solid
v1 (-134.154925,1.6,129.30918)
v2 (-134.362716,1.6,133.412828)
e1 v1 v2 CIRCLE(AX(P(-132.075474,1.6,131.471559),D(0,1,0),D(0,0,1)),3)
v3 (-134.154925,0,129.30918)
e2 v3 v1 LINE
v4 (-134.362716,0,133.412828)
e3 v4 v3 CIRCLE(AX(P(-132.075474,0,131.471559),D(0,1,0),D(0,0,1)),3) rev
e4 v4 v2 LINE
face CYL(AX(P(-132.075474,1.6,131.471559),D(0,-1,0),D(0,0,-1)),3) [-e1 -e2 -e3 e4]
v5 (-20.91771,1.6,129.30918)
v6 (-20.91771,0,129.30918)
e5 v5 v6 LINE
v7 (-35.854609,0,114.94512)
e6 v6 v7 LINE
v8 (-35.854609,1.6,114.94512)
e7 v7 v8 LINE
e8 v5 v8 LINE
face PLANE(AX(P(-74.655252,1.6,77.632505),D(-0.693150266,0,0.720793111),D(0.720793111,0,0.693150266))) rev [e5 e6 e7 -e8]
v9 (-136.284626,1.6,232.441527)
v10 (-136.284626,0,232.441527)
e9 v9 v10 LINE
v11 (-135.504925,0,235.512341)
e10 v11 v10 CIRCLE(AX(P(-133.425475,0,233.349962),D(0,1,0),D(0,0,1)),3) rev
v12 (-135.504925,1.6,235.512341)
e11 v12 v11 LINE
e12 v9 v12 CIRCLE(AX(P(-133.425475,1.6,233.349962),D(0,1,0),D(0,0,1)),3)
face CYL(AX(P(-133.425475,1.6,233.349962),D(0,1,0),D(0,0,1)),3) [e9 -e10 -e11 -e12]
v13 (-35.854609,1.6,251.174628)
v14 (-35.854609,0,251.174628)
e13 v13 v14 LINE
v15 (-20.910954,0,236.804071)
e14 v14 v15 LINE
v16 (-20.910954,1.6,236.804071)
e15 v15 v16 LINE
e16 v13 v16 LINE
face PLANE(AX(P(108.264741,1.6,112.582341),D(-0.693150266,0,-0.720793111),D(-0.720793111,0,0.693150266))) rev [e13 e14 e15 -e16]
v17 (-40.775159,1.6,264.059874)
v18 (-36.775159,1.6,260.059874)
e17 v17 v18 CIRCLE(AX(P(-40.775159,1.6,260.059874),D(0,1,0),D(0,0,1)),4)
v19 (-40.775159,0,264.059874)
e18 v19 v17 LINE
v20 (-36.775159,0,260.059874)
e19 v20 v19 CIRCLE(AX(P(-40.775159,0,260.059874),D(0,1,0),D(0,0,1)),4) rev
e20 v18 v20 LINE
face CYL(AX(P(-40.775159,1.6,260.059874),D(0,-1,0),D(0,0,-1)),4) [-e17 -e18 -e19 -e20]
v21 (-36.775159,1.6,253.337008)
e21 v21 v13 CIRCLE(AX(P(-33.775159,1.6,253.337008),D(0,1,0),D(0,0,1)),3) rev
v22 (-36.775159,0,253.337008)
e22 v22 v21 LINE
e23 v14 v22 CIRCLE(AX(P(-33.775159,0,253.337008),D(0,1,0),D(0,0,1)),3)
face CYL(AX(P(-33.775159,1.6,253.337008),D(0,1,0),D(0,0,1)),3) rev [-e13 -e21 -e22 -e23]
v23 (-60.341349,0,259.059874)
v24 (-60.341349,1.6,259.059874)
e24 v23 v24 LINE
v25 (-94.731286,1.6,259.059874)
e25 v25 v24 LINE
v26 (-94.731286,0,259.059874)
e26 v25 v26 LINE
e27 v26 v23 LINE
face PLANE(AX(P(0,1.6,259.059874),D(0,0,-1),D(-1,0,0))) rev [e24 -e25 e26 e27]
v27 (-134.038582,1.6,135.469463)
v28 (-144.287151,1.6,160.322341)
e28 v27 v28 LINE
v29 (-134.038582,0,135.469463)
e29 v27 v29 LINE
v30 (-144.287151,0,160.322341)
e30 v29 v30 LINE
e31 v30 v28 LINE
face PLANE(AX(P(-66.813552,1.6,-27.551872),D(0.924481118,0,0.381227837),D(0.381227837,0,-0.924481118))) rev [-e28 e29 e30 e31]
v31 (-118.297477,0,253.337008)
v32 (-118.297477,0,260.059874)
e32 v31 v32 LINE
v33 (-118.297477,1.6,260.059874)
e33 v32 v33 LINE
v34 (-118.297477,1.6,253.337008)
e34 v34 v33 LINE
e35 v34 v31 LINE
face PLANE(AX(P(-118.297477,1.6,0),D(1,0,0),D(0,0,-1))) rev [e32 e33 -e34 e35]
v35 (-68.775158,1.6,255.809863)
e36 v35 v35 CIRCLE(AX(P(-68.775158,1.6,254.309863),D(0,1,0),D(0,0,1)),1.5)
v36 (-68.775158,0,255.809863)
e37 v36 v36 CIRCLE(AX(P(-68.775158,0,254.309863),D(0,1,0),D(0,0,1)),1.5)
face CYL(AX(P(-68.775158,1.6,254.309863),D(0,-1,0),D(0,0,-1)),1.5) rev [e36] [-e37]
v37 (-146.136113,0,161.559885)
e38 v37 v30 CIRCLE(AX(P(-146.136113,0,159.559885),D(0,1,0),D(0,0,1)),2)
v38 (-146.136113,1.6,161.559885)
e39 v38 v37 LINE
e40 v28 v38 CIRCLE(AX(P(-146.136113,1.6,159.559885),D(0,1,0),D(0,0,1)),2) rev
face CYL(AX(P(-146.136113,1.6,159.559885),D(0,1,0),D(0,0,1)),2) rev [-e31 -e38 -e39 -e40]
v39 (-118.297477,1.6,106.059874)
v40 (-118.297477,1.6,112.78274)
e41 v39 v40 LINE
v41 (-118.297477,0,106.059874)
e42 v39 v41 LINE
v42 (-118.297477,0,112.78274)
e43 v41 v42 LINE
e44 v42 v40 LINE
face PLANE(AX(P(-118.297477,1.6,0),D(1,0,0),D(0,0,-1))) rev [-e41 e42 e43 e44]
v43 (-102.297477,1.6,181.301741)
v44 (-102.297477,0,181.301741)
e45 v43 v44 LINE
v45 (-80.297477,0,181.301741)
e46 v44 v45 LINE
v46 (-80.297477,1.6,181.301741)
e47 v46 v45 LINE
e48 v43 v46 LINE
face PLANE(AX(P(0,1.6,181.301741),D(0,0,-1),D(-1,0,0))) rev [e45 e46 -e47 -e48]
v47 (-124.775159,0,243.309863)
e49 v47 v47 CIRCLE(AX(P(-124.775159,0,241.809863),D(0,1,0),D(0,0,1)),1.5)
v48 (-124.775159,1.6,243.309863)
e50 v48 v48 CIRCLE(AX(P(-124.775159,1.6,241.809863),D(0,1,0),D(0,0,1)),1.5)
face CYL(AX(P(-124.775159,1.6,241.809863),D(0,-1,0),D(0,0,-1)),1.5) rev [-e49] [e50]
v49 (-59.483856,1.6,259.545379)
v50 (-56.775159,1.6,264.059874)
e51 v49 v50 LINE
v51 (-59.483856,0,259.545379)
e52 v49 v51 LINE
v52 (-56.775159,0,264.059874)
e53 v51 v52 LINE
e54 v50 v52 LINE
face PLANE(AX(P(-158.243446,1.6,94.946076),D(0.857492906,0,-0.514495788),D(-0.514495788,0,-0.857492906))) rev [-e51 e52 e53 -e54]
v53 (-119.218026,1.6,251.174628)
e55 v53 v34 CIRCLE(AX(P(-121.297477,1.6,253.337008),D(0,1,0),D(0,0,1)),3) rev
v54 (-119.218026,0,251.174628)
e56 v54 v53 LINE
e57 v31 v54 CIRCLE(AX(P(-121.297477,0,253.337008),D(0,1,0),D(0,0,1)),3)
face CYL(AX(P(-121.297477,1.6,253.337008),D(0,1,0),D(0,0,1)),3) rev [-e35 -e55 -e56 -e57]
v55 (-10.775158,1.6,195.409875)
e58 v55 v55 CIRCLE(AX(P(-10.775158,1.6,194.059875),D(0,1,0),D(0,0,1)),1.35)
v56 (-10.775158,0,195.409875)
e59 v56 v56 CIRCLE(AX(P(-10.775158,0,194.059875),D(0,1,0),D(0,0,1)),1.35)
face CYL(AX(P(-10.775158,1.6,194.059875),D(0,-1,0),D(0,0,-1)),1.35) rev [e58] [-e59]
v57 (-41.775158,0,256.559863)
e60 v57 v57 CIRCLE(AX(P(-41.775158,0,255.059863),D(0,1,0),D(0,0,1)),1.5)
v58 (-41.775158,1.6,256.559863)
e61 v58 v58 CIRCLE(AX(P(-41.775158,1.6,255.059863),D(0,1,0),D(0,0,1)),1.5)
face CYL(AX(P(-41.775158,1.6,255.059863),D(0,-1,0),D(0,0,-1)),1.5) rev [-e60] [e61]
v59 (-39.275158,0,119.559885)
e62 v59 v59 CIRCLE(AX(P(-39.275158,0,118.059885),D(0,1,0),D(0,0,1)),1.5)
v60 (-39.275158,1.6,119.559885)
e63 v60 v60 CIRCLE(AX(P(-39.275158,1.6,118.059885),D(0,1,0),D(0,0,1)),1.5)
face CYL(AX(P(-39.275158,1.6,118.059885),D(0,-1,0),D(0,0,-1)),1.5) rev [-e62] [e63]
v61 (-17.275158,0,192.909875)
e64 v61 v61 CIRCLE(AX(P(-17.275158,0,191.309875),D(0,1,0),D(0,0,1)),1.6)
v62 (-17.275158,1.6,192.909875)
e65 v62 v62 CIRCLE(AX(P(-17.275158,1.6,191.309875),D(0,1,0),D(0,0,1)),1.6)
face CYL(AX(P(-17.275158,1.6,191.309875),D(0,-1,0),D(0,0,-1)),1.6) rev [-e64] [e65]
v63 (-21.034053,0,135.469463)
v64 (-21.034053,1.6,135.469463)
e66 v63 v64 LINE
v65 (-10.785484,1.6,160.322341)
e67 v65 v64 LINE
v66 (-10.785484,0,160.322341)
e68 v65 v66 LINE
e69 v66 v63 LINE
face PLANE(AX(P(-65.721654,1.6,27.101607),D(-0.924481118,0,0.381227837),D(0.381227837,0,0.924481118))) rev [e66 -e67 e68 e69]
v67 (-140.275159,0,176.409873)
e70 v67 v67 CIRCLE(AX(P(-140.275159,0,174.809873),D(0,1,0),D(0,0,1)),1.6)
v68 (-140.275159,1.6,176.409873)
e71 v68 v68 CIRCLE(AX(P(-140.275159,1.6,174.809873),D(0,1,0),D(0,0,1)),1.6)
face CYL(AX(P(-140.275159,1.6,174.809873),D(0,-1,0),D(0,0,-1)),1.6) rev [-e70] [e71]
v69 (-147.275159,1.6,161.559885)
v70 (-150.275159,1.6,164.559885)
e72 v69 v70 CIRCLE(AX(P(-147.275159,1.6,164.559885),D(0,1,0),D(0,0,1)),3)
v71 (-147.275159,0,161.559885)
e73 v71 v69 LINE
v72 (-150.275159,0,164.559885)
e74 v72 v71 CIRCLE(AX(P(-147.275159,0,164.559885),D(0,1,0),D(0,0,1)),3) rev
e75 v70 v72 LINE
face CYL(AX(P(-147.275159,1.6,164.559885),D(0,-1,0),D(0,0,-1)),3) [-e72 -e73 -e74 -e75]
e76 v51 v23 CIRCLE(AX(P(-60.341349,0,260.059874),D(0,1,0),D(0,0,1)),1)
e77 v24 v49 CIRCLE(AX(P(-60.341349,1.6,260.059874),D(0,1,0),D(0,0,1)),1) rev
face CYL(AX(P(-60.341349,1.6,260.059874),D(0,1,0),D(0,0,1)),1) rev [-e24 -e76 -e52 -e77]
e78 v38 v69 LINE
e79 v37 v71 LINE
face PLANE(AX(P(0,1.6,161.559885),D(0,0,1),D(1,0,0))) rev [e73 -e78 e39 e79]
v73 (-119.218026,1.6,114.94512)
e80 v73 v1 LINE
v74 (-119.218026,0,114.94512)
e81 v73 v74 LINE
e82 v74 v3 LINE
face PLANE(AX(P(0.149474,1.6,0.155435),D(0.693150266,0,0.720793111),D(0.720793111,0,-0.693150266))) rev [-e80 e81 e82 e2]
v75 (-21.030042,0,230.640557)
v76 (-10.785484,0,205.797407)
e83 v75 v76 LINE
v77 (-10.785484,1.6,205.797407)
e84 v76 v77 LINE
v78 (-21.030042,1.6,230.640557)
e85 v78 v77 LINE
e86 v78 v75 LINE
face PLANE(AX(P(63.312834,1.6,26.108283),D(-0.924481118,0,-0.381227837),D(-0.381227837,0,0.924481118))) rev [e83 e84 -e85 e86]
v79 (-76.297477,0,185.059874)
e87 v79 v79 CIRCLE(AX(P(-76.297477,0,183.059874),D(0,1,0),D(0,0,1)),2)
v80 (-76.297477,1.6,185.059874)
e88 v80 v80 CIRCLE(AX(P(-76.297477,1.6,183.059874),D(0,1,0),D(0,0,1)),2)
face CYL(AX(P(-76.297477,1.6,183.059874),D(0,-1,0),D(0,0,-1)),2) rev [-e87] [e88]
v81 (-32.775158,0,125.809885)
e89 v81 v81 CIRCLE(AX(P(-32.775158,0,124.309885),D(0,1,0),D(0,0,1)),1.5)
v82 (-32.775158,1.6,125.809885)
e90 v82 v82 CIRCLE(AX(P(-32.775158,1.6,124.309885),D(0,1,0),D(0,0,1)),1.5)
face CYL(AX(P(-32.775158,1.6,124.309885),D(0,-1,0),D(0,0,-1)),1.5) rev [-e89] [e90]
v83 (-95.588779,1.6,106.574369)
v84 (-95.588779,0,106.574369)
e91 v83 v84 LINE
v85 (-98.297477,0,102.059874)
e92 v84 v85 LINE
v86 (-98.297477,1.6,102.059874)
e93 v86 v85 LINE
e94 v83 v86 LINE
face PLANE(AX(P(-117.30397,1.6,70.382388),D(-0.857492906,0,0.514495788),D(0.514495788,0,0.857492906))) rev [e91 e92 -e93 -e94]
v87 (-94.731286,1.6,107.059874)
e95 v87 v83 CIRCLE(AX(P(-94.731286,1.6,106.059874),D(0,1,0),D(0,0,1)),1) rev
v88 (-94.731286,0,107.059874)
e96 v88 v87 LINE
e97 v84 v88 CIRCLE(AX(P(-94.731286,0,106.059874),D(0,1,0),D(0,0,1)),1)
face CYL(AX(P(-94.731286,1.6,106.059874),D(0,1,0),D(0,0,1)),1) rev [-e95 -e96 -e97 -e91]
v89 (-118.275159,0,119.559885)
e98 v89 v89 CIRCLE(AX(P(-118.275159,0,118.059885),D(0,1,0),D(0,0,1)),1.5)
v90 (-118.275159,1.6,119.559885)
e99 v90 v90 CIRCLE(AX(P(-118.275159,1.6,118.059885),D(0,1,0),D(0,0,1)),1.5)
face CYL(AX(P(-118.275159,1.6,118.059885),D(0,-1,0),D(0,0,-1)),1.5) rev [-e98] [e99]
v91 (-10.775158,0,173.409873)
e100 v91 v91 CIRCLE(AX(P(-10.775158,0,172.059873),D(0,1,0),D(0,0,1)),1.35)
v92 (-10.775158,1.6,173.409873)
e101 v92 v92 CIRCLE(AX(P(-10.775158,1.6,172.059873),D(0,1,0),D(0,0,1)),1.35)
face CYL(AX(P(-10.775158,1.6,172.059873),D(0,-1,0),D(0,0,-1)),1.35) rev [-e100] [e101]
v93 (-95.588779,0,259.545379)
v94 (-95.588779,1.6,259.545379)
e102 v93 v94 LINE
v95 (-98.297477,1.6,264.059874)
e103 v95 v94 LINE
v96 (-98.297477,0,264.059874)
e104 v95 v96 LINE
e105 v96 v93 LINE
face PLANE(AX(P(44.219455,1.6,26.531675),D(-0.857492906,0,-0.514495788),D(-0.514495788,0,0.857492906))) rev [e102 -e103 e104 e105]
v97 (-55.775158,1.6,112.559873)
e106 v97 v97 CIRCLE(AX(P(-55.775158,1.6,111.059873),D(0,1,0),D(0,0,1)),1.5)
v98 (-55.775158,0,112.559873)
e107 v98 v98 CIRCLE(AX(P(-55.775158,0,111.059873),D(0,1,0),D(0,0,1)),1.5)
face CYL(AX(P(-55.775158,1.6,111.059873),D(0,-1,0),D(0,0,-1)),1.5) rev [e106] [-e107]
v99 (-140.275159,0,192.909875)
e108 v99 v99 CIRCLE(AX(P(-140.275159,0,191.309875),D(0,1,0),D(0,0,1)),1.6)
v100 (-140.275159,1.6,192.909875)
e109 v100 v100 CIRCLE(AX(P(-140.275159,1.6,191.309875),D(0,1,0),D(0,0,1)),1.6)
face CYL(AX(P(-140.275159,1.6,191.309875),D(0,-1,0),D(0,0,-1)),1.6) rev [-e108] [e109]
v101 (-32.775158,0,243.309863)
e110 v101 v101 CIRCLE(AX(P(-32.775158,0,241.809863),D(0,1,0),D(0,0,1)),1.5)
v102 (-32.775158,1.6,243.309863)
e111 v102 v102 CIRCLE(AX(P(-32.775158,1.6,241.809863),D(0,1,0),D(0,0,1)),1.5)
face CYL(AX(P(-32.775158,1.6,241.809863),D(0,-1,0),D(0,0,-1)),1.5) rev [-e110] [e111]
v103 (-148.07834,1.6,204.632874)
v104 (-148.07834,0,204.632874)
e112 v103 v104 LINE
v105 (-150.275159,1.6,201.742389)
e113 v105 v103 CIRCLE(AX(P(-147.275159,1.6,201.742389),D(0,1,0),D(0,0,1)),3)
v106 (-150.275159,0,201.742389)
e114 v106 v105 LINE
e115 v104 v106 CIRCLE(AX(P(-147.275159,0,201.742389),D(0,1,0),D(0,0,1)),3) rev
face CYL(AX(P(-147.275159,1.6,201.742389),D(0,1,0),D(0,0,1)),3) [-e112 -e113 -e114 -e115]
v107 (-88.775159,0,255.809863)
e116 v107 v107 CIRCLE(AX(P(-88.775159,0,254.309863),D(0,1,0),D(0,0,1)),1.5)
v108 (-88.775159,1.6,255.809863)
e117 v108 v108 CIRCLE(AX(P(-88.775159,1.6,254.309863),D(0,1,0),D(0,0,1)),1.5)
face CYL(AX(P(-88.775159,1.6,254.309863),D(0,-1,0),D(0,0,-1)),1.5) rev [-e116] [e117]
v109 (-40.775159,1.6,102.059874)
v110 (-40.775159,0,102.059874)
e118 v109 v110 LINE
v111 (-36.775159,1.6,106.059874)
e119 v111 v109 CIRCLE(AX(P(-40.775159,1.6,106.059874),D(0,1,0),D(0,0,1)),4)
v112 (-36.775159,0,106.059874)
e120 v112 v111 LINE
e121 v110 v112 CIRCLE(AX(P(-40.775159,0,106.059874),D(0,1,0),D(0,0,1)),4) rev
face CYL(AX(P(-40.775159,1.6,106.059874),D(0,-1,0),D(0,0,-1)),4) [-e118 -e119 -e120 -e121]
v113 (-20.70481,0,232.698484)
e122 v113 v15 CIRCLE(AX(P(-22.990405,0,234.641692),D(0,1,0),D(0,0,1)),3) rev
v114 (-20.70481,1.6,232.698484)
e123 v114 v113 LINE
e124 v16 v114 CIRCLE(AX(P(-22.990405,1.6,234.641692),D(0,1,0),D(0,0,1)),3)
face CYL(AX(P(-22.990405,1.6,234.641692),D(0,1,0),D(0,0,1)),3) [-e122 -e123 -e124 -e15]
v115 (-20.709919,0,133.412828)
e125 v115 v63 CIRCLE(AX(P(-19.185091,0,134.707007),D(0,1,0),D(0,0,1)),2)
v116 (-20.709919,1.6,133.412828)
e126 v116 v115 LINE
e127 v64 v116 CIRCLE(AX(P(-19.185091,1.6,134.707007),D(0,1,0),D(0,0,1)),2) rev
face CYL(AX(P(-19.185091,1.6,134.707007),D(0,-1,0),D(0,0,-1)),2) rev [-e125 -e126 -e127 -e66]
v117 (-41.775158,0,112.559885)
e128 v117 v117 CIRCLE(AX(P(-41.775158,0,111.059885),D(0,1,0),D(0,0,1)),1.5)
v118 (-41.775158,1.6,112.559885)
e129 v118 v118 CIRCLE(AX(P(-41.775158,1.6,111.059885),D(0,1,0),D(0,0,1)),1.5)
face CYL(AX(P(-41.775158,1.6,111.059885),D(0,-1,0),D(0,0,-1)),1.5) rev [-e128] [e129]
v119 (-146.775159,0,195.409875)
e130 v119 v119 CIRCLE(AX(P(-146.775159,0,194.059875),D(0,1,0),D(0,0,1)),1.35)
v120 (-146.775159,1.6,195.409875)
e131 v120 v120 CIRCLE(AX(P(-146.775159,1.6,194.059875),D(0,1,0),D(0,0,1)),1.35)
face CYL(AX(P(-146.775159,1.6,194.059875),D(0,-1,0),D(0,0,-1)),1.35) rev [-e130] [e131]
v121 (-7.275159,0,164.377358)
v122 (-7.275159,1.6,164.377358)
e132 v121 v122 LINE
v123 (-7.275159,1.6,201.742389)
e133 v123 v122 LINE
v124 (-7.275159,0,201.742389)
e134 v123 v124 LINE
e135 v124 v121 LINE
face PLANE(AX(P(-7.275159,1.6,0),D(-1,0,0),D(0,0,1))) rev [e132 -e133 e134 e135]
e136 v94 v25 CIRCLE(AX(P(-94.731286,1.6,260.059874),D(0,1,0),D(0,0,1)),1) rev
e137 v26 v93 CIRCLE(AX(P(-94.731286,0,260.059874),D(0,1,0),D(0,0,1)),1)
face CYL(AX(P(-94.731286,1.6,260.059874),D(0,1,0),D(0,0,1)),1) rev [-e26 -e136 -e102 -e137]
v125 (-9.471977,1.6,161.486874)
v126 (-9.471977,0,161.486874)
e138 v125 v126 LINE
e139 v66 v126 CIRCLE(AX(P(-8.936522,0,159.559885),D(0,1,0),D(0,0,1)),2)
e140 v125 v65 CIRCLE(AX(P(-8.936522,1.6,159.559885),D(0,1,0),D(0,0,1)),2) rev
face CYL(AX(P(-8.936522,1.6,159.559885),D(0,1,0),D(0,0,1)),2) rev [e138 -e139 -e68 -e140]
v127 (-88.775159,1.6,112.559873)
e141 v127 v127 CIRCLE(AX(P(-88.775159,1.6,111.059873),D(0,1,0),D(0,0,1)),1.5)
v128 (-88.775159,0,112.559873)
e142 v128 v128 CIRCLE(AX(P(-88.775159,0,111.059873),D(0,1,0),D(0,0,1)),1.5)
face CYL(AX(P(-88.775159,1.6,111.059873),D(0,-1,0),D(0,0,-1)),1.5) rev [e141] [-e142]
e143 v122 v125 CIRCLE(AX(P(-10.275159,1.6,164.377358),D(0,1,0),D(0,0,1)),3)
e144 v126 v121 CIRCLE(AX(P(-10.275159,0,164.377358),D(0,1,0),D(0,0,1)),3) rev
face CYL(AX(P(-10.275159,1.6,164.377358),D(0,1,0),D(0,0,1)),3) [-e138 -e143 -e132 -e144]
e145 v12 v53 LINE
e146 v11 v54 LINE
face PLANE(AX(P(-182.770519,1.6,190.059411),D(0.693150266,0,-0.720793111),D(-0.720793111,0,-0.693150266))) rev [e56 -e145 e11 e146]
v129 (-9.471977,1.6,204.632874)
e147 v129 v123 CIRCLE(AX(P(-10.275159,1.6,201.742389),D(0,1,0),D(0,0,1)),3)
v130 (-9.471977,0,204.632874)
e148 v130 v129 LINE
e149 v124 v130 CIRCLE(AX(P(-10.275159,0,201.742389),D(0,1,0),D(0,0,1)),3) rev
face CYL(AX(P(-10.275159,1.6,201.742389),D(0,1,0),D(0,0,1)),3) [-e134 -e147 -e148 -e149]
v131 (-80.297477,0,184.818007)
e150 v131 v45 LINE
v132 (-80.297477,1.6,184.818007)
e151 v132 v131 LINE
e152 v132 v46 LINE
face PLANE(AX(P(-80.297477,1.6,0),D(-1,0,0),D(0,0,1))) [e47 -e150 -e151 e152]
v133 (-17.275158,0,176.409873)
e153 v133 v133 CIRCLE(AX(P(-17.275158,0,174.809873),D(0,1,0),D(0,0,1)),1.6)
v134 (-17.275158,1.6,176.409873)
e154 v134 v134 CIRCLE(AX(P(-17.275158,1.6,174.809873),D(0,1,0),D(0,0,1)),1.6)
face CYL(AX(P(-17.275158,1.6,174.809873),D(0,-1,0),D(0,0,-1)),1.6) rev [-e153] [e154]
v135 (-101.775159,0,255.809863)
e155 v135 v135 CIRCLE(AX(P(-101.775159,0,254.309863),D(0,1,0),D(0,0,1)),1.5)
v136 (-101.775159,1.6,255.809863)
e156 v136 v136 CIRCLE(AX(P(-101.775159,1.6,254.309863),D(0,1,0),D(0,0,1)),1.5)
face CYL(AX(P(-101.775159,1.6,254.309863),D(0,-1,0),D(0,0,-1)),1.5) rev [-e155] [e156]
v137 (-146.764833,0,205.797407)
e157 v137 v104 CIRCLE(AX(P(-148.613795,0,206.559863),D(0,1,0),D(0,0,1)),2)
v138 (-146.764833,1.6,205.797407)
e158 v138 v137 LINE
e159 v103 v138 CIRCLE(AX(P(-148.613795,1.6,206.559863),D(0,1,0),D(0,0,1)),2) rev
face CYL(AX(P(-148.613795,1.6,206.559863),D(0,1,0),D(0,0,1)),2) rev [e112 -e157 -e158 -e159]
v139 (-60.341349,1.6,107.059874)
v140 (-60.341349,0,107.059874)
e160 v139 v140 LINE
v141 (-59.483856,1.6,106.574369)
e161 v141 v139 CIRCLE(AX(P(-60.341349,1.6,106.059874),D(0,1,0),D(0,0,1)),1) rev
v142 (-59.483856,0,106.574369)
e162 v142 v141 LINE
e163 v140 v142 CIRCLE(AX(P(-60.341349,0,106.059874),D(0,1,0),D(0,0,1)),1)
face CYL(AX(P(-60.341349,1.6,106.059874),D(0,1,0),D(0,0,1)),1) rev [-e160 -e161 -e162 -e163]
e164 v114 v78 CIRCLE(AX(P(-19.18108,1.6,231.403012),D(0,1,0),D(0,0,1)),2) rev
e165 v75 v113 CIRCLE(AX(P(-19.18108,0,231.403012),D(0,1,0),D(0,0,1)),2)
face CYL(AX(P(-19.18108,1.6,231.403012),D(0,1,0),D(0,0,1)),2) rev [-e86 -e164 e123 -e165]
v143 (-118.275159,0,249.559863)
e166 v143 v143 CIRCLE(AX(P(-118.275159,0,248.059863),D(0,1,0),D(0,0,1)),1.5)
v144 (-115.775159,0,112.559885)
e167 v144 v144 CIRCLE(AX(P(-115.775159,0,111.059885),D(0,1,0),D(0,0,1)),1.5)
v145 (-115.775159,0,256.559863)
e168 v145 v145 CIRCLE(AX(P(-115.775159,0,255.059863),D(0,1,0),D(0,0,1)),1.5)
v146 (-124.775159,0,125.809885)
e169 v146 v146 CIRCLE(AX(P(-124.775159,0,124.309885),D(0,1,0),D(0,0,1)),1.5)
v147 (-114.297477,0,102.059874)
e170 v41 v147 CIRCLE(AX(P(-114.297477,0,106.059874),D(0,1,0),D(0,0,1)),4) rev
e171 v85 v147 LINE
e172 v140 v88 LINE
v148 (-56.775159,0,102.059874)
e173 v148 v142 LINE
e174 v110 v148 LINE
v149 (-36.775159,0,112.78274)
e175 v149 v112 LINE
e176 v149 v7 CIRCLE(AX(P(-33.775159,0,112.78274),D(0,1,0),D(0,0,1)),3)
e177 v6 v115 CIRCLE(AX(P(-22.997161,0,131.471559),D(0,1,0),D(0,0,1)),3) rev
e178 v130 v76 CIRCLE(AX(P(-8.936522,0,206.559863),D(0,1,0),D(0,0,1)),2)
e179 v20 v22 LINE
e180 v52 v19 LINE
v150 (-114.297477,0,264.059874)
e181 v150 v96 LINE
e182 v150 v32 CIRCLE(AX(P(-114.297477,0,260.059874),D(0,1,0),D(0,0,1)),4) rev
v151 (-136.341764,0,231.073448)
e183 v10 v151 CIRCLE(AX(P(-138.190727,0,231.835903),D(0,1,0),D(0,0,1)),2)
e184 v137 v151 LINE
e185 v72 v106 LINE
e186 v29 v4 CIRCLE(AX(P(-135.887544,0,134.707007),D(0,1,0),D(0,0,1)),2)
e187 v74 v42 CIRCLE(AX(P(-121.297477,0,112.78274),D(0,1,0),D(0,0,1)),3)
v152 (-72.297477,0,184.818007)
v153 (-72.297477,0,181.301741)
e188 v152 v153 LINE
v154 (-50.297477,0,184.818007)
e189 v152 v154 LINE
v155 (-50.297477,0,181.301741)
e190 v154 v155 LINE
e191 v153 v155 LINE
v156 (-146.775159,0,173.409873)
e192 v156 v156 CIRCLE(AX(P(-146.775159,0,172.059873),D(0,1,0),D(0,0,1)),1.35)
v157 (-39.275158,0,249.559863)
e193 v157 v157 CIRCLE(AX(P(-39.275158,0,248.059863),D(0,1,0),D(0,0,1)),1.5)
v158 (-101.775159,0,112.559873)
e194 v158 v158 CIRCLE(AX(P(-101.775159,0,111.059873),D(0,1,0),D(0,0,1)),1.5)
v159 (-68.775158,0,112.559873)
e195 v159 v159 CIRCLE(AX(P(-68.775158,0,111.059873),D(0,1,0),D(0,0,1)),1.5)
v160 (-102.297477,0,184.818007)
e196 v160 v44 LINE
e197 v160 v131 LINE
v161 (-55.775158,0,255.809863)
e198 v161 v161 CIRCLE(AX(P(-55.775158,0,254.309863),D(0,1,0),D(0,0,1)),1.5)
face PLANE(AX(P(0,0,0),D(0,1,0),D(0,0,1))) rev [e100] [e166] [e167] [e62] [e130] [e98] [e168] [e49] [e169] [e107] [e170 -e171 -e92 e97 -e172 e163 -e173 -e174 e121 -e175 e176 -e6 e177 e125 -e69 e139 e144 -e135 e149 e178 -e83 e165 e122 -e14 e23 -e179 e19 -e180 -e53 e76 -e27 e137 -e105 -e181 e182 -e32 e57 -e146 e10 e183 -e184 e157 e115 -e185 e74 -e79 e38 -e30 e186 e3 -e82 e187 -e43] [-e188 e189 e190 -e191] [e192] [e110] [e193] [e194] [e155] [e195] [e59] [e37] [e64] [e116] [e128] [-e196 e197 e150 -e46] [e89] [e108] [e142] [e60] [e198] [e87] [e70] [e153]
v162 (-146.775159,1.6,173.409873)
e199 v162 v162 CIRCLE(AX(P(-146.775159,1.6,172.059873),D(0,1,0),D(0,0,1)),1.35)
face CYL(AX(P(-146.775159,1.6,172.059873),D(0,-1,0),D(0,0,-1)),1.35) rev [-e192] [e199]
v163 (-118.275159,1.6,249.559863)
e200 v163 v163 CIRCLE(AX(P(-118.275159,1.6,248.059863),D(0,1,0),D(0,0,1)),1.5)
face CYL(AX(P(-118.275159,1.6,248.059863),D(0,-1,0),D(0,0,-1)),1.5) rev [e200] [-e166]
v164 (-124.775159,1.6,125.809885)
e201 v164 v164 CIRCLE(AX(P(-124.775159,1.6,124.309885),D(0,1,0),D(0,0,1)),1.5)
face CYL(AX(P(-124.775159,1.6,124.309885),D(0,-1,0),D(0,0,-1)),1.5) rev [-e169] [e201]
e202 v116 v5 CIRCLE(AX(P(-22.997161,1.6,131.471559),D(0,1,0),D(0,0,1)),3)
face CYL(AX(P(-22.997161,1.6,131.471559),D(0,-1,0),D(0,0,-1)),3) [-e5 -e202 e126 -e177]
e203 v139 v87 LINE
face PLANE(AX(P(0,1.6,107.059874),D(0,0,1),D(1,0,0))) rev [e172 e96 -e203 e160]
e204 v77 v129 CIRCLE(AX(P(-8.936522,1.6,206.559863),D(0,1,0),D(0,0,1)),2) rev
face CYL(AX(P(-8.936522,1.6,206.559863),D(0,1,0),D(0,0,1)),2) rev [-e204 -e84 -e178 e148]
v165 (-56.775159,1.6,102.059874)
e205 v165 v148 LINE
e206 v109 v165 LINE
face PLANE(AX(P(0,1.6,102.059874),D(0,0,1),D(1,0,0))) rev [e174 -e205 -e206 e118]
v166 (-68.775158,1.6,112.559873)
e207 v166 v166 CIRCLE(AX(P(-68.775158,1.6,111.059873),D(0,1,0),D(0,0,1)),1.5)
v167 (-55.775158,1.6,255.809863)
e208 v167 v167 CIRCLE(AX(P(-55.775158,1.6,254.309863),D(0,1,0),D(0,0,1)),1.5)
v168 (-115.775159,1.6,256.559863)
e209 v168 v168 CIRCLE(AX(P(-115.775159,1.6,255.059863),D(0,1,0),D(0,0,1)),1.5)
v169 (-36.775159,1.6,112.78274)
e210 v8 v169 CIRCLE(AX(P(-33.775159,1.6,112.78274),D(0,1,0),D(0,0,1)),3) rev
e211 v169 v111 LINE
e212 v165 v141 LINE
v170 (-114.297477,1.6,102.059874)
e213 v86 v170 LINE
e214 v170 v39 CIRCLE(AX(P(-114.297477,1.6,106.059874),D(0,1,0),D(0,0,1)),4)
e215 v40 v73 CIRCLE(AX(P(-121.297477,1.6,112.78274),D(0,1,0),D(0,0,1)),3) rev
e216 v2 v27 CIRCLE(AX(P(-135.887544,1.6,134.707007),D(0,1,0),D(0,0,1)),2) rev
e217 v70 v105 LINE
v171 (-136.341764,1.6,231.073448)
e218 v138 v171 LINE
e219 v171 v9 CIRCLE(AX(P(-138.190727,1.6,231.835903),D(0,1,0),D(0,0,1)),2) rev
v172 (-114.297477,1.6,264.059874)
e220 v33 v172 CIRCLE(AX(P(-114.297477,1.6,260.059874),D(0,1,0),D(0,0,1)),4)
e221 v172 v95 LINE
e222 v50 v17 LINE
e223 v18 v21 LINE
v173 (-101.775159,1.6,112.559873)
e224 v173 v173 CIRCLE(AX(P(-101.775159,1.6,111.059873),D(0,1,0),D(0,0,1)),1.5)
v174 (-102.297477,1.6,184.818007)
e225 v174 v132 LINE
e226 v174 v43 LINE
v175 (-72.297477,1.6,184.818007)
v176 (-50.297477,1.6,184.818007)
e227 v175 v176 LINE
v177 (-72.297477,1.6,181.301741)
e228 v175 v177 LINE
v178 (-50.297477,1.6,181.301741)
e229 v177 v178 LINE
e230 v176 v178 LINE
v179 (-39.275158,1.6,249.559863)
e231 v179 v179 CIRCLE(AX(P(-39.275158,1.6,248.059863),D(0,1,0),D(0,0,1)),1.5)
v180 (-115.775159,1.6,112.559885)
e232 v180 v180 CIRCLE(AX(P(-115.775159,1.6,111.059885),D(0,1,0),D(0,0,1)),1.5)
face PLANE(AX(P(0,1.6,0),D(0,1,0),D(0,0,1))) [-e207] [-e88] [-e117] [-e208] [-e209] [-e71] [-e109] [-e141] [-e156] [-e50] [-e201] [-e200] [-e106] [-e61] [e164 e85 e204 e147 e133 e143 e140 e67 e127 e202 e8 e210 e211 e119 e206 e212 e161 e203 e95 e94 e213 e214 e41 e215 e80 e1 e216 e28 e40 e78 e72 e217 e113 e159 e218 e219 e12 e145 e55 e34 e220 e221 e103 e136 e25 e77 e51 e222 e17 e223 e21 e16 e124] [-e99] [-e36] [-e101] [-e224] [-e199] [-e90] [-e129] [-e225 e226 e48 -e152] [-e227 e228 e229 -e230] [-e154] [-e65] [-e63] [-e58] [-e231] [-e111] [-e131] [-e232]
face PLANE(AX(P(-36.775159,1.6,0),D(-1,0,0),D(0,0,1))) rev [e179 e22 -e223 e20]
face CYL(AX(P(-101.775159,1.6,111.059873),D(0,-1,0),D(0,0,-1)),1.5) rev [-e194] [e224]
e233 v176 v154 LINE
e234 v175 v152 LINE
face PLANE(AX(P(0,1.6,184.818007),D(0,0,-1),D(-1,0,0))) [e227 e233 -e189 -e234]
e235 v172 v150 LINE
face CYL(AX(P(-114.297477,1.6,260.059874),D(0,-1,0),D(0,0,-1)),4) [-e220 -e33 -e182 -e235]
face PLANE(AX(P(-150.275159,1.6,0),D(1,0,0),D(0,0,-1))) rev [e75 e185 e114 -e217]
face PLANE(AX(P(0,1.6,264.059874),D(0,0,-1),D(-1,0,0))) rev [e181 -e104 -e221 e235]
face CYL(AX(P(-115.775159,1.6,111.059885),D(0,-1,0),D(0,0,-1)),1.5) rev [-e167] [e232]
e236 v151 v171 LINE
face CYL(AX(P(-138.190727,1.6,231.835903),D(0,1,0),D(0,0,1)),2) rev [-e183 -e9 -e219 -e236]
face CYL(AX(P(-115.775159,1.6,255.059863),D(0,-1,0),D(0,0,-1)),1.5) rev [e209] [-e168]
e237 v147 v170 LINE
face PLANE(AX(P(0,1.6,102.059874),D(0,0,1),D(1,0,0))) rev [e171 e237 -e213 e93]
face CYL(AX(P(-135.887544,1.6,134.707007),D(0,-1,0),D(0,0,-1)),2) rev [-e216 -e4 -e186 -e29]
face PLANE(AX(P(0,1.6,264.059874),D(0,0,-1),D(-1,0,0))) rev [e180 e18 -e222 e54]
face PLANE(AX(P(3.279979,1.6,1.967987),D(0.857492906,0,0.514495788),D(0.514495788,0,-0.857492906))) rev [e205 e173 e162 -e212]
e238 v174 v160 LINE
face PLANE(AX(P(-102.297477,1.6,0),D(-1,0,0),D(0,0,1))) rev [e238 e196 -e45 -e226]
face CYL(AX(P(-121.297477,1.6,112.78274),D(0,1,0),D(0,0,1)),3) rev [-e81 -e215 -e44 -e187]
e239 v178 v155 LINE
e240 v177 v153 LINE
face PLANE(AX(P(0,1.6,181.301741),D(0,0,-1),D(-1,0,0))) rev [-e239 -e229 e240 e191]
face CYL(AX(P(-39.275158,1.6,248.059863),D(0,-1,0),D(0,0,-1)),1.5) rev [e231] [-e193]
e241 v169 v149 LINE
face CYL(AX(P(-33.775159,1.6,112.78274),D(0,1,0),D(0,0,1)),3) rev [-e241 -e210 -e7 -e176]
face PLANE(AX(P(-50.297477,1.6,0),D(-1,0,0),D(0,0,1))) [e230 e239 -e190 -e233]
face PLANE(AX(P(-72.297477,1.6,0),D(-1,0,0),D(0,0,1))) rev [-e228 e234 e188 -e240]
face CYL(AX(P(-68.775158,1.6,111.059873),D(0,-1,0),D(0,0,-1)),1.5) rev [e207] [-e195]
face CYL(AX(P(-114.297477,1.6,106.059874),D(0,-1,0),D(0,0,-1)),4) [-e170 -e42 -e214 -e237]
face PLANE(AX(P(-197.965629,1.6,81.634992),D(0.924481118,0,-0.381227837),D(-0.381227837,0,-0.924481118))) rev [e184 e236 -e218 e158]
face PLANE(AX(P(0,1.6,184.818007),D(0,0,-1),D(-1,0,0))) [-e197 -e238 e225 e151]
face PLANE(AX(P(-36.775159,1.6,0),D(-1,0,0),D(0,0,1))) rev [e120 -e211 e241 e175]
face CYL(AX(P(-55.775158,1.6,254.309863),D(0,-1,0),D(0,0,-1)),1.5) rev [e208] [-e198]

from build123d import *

# Parameters (mm, degrees)
SKETCH1_R        = 1.5
SKETCH1_R_2      = 1.6
SKETCH1_R_3      = 2
SKETCH1_R_4      = 1.35
SKETCH1_W        = 22
SKETCH1_H        = 3.516266508
EXTRUSION1_DEPTH = 1.6
FILLET1_R        = 1
FILLET2_R        = 4
FILLET3_R        = 3
FILLET4_R        = 3
FILLET5_R        = 2
FILLET6_R        = 2
FILLET7_R        = 3
FILLET8_R        = 3
FILLET9_R        = 2
FILLET10_R       = 2
FILLET11_R       = 3


with BuildPart() as part:
    # Sketch1 → Extrusion1 (new body)
    with BuildSketch(Plane(origin=(0, 0, 0), x_dir=(-1, 0, 0), z_dir=(0, 1, 0))):
        Polygon((59.775158519, 259.059874387), (56.775158519, 264.05987395), (36.775158519, 264.05987395), (36.775158519, 252.05987395), (18.755330752, 234.731117294), (21.527931817, 231.847944851), (10.275158581, 204.559863083), (7.275158519, 204.559863083), (7.275158519, 183.059873956), (7.275158519, 161.559884829), (10.275158581, 161.559884829), (21.527931817, 134.27180306), (18.755330752, 131.388630617), (36.775158519, 114.059873961), (36.775158519, 102.059873961), (56.775158519, 102.059873961), (59.775158519, 107.059873524), (76.297476624, 107.059873524), (95.297476624, 107.059873524), (98.297476624, 102.059873961), (118.297476624, 102.059873961), (118.297476624, 114.059873961), (136.317304391, 131.388630617), (133.544703326, 134.27180306), (144.797476562, 161.559884829), (150.275158519, 161.559884829), (150.275158519, 183.059873956), (150.275158519, 204.559863083), (147.275158457, 204.559863083), (136.022385221, 231.847944851), (137.604565953, 233.493222978), (118.297476624, 252.05987395), (118.297476624, 264.05987395), (98.297476624, 264.05987395), (95.297476624, 259.059874387), (76.297476624, 259.059874387), align=None)
        with Locations(Location((55.775158457, 111.059872631, 0), (0, 0, 90))):
            Circle(SKETCH1_R, mode=Mode.SUBTRACT)
        with Locations(Location((39.275158457, 118.059884829, 0), (0, 0, 90))):
            Circle(SKETCH1_R, mode=Mode.SUBTRACT)
        with Locations(Location((17.275158457, 174.809872631, 0), (0, 0, 90))):
            Circle(SKETCH1_R_2, mode=Mode.SUBTRACT)
        with Locations(Location((76.297476624, 183.059873956, 0), (0, 0, 90))):
            Circle(SKETCH1_R_3, mode=Mode.SUBTRACT)
        with Locations(Location((41.775158457, 255.059863083, 0), (0, 0, 90))):
            Circle(SKETCH1_R, mode=Mode.SUBTRACT)
        with Locations(Location((39.275158457, 248.059863083, 0), (0, 0, 90))):
            Circle(SKETCH1_R, mode=Mode.SUBTRACT)
        with Locations(Location((10.775158457, 194.05987528, 0), (0, 0, 90))):
            Circle(SKETCH1_R_4, mode=Mode.SUBTRACT)
        with Locations(Location((88.775158581, 111.059872631, 0), (0, 0, 90))):
            Circle(SKETCH1_R, mode=Mode.SUBTRACT)
        with Locations(Location((115.775158581, 111.059884829, 0), (0, 0, 90))):
            Circle(SKETCH1_R, mode=Mode.SUBTRACT)
        with Locations(Location((118.275158581, 118.059884829, 0), (0, 0, 90))):
            Circle(SKETCH1_R, mode=Mode.SUBTRACT)
        with Locations(Location((140.275158581, 174.809872631, 0), (0, 0, 90))):
            Circle(SKETCH1_R_2, mode=Mode.SUBTRACT)
        with Locations(Location((115.775158581, 255.059863083, 0), (0, 0, 90))):
            Circle(SKETCH1_R, mode=Mode.SUBTRACT)
        with Locations(Location((88.775158581, 254.309863083, 0), (0, 0, 90))):
            Circle(SKETCH1_R, mode=Mode.SUBTRACT)
        with Locations(Location((140.275158581, 191.30987528, 0), (0, 0, 90))):
            Circle(SKETCH1_R_2, mode=Mode.SUBTRACT)
        with Locations(Location((146.775158581, 194.05987528, 0), (0, 0, 90))):
            Circle(SKETCH1_R_4, mode=Mode.SUBTRACT)
        with Locations(Location((101.775158581, 254.309863083, 0), (0, 0, 90))):
            Circle(SKETCH1_R, mode=Mode.SUBTRACT)
        with Locations(Location((118.275158581, 248.059863083, 0), (0, 0, 90))):
            Circle(SKETCH1_R, mode=Mode.SUBTRACT)
        with Locations(Location((146.775158581, 172.059872631, 0), (0, 0, 90))):
            Circle(SKETCH1_R_4, mode=Mode.SUBTRACT)
        with Locations(Location((101.775158581, 111.059872631, 0), (0, 0, 90))):
            Circle(SKETCH1_R, mode=Mode.SUBTRACT)
        with Locations(Location((17.275158457, 191.30987528, 0), (0, 0, 90))):
            Circle(SKETCH1_R_2, mode=Mode.SUBTRACT)
        with Locations(Location((55.775158457, 254.309863083, 0), (0, 0, 90))):
            Circle(SKETCH1_R, mode=Mode.SUBTRACT)
        with Locations(Location((68.775158457, 254.309863083, 0), (0, 0, 90))):
            Circle(SKETCH1_R, mode=Mode.SUBTRACT)
        with Locations(Location((10.775158457, 172.059872631, 0), (0, 0, 90))):
            Circle(SKETCH1_R_4, mode=Mode.SUBTRACT)
        with Locations(Location((68.775158457, 111.059872631, 0), (0, 0, 90))):
            Circle(SKETCH1_R, mode=Mode.SUBTRACT)
        with Locations(Location((41.775158457, 111.059884829, 0), (0, 0, 90))):
            Circle(SKETCH1_R, mode=Mode.SUBTRACT)
        with Locations(Location((32.775158457, 124.309884829, 0), (0, 0, 90))):
            Circle(SKETCH1_R, mode=Mode.SUBTRACT)
        with Locations(Location((124.775158581, 241.809863083, 0), (0, 0, 90))):
            Circle(SKETCH1_R, mode=Mode.SUBTRACT)
        with Locations(Location((32.775158457, 241.809863083, 0), (0, 0, 90))):
            Circle(SKETCH1_R, mode=Mode.SUBTRACT)
        with Locations(Location((124.775158581, 124.309884829, 0), (0, 0, 90))):
            Circle(SKETCH1_R, mode=Mode.SUBTRACT)
        with Locations((61.297476624, 183.059873956)):
            Rectangle(SKETCH1_W, SKETCH1_H, mode=Mode.SUBTRACT)
        with Locations((91.297476624, 183.059873956)):
            Rectangle(SKETCH1_W, SKETCH1_H, mode=Mode.SUBTRACT)
    extrude(amount=EXTRUSION1_DEPTH)

    # Fillet1
    fillet1_edges = [part.edges().sort_by_distance(p)[0] for p in [
        (-95.297476624, 0.8, 259.059874387),
        (-95.297476624, 0.8, 107.059873524),
        (-59.775158519, 0.8, 107.059873524),
        (-59.775158519, 0.8, 259.059874387),
    ]]
    fillet(fillet1_edges, radius=FILLET1_R)

    # Fillet2
    fillet2_edges = [part.edges().sort_by_distance(p)[0] for p in [
        (-118.297476624, 0.8, 264.05987395),
        (-118.297476624, 0.8, 102.059873961),
        (-36.775158519, 0.8, 102.059873961),
        (-36.775158519, 0.8, 264.05987395),
    ]]
    fillet(fillet2_edges, radius=FILLET2_R)

    # Fillet3
    fillet3_edges = [part.edges().sort_by_distance(p)[0] for p in [
        (-118.297476624, 0.8, 252.05987395),
        (-118.297476624, 0.8, 114.059873961),
        (-36.775158519, 0.8, 114.059873961),
        (-36.775158519, 0.8, 252.05987395),
    ]]
    fillet(fillet3_edges, radius=FILLET3_R)

    # Fillet4
    # the kernel refuses this fillet: 3 mm, written as the material it takes off along each edge
    with BuildSketch(Plane(origin=(-137.604565953, -7.282396937, 233.493222978), x_dir=(0.7207931106757886, 0, 0.6931502662499095), z_dir=(0, 1, 0))) as fillet4_piece_1:
        with BuildLine():
            CenterArc((2.912958775, 3), FILLET4_R, 193.835510016, 76.164489984)
            Line((0, 2.282594135), (-0.058259176, 2.268246017))
            ThreePointArc((-0.058259176, 2.268246017), (-0.06, 1.141297067), (-0.06, 0))
            Line((-0.06, 0), (0, -0.06))
            Line((0, -0.06), (2.912958775, -0.06))
            Line((2.912958775, -0.06), (2.912958775, 0))
        make_face()
    extrude(amount=16.164793875, mode=Mode.SUBTRACT)

    # Fillet5
    fillet5_edges = [part.edges().sort_by_distance(p)[0] for p in [
        (-136.022385221, 0.8, 231.847944851),
    ]]
    fillet(fillet5_edges, radius=FILLET5_R)

    # Fillet6
    fillet6_edges = [part.edges().sort_by_distance(p)[0] for p in [
        (-21.527931817, 0.8, 231.847944851),
    ]]
    fillet(fillet6_edges, radius=FILLET6_R)

    # Fillet7
    fillet7_edges = [part.edges().sort_by_distance(p)[0] for p in [
        (-18.755330752, 0.8, 234.731117294),
    ]]
    fillet(fillet7_edges, radius=FILLET7_R)

    # Fillet8
    fillet8_edges = [part.edges().sort_by_distance(p)[0] for p in [
        (-136.317304391, 0.8, 131.388630617),
        (-18.755330752, 0.8, 131.388630617),
    ]]
    fillet(fillet8_edges, radius=FILLET8_R)

    # Fillet9
    fillet9_edges = [part.edges().sort_by_distance(p)[0] for p in [
        (-21.527931817, 0.8, 134.27180306),
        (-133.544703326, 0.8, 134.27180306),
    ]]
    fillet(fillet9_edges, radius=FILLET9_R)

    # Fillet10
    fillet10_edges = [part.edges().sort_by_distance(p)[0] for p in [
        (-147.275158457, 0.8, 204.559863083),
        (-144.797476562, 0.8, 161.559884829),
        (-10.275158581, 0.8, 161.559884829),
        (-10.275158581, 0.8, 204.559863083),
    ]]
    fillet(fillet10_edges, radius=FILLET10_R)

    # Fillet11
    fillet11_edges = [part.edges().sort_by_distance(p)[0] for p in [
        (-150.275158519, 0.8, 161.559884829),
        (-150.275158519, 0.8, 204.559863083),
        (-7.275158519, 0.8, 204.559863083),
        (-7.275158519, 0.8, 161.559884829),
    ]]
    fillet(fillet11_edges, radius=FILLET11_R)


solid = part.part
